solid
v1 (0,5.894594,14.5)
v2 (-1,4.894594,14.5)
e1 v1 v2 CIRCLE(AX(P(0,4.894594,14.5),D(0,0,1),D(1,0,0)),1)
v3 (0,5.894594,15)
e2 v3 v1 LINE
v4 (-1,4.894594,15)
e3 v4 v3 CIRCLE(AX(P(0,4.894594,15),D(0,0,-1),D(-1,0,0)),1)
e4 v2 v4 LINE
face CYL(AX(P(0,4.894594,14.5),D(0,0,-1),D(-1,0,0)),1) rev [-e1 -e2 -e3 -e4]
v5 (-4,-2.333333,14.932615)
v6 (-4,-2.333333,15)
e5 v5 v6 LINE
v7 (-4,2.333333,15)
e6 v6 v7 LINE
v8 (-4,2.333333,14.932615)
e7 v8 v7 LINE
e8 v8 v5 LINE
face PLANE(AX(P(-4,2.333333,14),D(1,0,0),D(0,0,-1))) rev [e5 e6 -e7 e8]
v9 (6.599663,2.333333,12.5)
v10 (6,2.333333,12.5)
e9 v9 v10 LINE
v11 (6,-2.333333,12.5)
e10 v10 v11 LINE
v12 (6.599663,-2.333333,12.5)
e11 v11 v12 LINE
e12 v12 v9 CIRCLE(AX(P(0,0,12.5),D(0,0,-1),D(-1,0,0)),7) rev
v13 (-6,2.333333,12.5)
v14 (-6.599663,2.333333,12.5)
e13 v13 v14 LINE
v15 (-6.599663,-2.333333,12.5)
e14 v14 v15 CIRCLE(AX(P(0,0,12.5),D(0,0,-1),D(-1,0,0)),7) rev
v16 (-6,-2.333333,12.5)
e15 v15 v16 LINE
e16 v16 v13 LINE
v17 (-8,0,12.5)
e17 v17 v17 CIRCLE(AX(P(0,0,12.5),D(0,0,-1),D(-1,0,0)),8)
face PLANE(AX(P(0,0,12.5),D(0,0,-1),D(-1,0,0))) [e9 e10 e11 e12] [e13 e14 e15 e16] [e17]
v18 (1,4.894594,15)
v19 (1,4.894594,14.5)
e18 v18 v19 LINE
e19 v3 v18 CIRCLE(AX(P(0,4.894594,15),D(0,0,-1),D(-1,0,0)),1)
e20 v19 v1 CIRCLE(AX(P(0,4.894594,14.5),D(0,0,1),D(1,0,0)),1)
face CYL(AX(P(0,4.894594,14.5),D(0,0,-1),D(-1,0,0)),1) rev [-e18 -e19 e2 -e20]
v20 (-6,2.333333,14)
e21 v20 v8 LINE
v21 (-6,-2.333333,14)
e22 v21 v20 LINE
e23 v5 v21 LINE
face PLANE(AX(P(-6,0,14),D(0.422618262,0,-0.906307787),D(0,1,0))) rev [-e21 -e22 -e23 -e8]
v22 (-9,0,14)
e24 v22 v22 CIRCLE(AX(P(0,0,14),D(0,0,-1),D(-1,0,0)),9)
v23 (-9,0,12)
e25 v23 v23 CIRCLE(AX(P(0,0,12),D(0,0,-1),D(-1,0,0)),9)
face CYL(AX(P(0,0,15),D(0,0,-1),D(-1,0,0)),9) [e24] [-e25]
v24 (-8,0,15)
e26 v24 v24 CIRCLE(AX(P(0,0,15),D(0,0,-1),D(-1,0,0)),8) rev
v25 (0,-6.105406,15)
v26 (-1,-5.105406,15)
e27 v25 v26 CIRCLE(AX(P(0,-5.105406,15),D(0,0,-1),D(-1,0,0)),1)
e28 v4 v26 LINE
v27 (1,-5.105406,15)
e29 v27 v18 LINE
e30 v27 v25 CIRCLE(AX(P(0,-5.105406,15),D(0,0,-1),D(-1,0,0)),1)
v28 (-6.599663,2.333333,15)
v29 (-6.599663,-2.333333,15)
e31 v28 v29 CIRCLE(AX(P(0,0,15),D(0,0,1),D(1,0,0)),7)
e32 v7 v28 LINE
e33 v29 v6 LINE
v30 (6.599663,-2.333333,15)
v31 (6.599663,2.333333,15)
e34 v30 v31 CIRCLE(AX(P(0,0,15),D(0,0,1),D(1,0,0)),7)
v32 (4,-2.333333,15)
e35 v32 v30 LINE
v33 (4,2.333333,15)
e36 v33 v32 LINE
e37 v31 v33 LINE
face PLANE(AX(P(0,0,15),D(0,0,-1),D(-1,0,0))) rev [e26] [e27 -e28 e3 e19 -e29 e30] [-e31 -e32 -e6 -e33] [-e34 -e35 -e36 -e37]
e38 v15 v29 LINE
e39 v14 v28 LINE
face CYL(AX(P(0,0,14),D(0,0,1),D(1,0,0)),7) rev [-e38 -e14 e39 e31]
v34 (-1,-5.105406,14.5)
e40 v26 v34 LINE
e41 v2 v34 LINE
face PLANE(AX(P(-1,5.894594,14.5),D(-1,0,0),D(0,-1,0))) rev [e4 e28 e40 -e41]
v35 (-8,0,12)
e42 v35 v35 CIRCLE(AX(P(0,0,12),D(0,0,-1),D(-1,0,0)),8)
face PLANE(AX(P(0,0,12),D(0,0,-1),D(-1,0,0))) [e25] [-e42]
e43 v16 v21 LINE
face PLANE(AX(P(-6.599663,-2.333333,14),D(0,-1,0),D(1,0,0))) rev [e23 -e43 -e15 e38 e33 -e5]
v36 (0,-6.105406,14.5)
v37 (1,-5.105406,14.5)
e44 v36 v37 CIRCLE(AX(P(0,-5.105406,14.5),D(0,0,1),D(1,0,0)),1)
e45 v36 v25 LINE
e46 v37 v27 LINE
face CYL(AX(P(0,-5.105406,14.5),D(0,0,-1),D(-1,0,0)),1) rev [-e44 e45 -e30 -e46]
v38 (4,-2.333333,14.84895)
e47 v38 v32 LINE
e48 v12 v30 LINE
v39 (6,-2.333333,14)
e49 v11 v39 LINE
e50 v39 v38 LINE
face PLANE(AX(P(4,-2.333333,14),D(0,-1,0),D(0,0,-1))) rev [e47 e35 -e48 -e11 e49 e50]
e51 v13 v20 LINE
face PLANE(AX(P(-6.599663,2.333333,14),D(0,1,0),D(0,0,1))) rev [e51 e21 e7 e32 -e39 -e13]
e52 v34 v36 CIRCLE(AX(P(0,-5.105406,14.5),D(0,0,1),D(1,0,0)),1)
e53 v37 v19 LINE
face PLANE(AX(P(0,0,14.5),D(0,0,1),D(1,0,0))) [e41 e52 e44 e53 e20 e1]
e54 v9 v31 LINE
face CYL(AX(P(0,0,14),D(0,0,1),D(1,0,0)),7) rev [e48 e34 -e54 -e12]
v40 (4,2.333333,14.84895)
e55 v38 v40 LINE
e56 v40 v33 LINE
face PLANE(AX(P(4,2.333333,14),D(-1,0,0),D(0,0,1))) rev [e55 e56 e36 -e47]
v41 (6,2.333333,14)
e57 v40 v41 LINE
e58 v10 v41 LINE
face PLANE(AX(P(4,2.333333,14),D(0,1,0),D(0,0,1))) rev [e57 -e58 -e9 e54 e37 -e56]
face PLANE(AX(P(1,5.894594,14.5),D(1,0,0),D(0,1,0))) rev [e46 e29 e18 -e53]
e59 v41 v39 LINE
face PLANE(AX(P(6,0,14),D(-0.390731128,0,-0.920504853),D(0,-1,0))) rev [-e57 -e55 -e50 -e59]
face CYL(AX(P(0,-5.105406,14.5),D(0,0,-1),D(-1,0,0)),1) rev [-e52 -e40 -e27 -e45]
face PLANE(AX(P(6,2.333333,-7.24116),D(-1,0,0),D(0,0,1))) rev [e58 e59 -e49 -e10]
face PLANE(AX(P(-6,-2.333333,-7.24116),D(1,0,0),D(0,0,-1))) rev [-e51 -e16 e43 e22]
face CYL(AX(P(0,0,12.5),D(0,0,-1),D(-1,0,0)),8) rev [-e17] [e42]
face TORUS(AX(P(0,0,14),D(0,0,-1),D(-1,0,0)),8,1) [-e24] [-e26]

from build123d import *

# Parameters (mm, degrees)
SKETCH_1_R          = 9
EXTRUDE_1_DEPTH     = 3
FILLET_1_R          = 1
SKETCH_3_W          = 2
SKETCH_3_H          = 12
CUT_EXTRUDE_1_DEPTH = 0.5
FILLET_2_R          = 1
CUT_EXTRUDE_2_DEPTH = 1
CHAMFER_2_SIZE      = 2
CHAMFER_2_SIZE2     = 0.932615316
CHAMFER_5_SIZE      = 2
CHAMFER_5_SIZE2     = 0.848949632
CUT_EXTRUDE_3_DEPTH = 8
CUT_EXTRUDE_START   = -2
SKETCH_7_R          = 7
CUT_EXTRUDE_4_DEPTH = 2
EXTRUDE_2_DEPTH     = 2
SKETCH_9_R          = 8
CUT_EXTRUDE_5_DEPTH = 0.5


with BuildPart() as part:
    # 草图1 → 凸台-拉伸1 (new body)
    with BuildSketch(Plane(origin=(0, 0, 12), x_dir=(-1, 0, 0), z_dir=(0, 0, -1))):
        Circle(SKETCH_1_R)
    extrude(amount=-EXTRUDE_1_DEPTH)

    # 圆角1
    fillet_1_edges = [part.edges().sort_by_distance(p)[0] for p in [
        (9, 0, 15),
    ]]
    fillet(fillet_1_edges, radius=FILLET_1_R)

    # 草图3 → 切除-拉伸1 (cut)
    with BuildSketch(Plane.XY.offset(15)):
        with Locations((0, -0.105406486)):
            Rectangle(SKETCH_3_W, SKETCH_3_H)
    extrude(amount=-CUT_EXTRUDE_1_DEPTH, mode=Mode.SUBTRACT)

    # 圆角2
    fillet_2_edges = [part.edges().sort_by_distance(p)[0] for p in [
        (1, -6.105406486, 14.75),
        (-1, -6.105406486, 14.75),
        (1, 5.894593514, 14.75),
        (-1, 5.894593514, 14.75),
    ]]
    fillet(fillet_2_edges, radius=FILLET_2_R - 0.0001)  # a hair under: the kernel refuses the full size

    # 草图4 → 切除-拉伸2 (cut)
    with BuildSketch(Plane.XY.offset(15)):
        with BuildLine():
            Line((-6.599663291, 2.333333333), (-4, 2.333333333))
            Line((-4, 2.333333333), (-4, -2.333333333))
            Line((-4, -2.333333333), (-6.599663291, -2.333333333))
            ThreePointArc((-6.599663291, -2.333333333), (-7, 0), (-6.599663291, 2.333333333))
        make_face()
        with BuildLine():
            Line((4, -2.333333333), (6.599663291, -2.333333333))
            ThreePointArc((6.599663291, -2.333333333), (7, 0), (6.599663291, 2.333333333))
            Line((6.599663291, 2.333333333), (4, 2.333333333))
            Line((4, 2.333333333), (4, -2.333333333))
        make_face()
    extrude(amount=-CUT_EXTRUDE_2_DEPTH, mode=Mode.SUBTRACT)

    # 倒角2
    chamfer_2_edges = [part.edges().sort_by_distance(p)[0] for p in [
        (-4, 0, 14),
    ]]
    chamfer_2_side = [part.faces().sort_by_distance(p)[0] for p in [
        (-5.436521823, 0, 14),
    ]]
    chamfer(chamfer_2_edges, length=CHAMFER_2_SIZE, length2=CHAMFER_2_SIZE2, reference=chamfer_2_side[0])

    # 倒角5
    chamfer_5_edges = [part.edges().sort_by_distance(p)[0] for p in [
        (4, 0, 14),
    ]]
    chamfer_5_side = [part.faces().sort_by_distance(p)[0] for p in [
        (5.436521823, 0, 14),
    ]]
    chamfer(chamfer_5_edges, length=CHAMFER_5_SIZE, length2=CHAMFER_5_SIZE2, reference=chamfer_5_side[0])

    # 草图6 → 切除-拉伸3 (cut)
    with BuildSketch(Plane.XY.offset(14)):
        with BuildLine():
            Line((-6.599663291, -2.333333333), (-6, -2.333333333))
            Line((-6, -2.333333333), (-6, 2.333333333))
            Line((-6, 2.333333333), (-6.599663291, 2.333333333))
            ThreePointArc((-6.599663291, 2.333333333), (-7, 0), (-6.599663291, -2.333333333))
        make_face()
        with BuildLine():
            Line((6.599663291, 2.333333333), (6, 2.333333333))
            Line((6, 2.333333333), (6, -2.333333333))
            Line((6, -2.333333333), (6.599663291, -2.333333333))
            ThreePointArc((6.599663291, -2.333333333), (7, 0), (6.599663291, 2.333333333))
        make_face()
    extrude(amount=-CUT_EXTRUDE_3_DEPTH, mode=Mode.SUBTRACT)

    # 草图7 → 切除-拉伸4 (cut)
    with BuildSketch(Plane(origin=(0, 0, 12), x_dir=(-1, 0, 0), z_dir=(0, 0, -1)).offset(CUT_EXTRUDE_START)):
        with Locations(Location((0, 0, 0), (0, 0, 199.471220634))):
            Circle(SKETCH_7_R)
    extrude(amount=CUT_EXTRUDE_4_DEPTH, mode=Mode.SUBTRACT)

    # 草图8 → 凸台-拉伸2 (add)
    with BuildSketch(Plane(origin=(0, 0, 14), x_dir=(-1, 0, 0), z_dir=(0, 0, -1))):
        with BuildLine():
            Line((-6.599663291, 2.333333333), (-6, 2.333333333))
            Line((-6, 2.333333333), (-6, -2.333333333))
            Line((-6, -2.333333333), (-6.599663291, -2.333333333))
            ThreePointArc((-6.599663291, -2.333333333), (0, -7), (6.599663291, -2.333333333))
            Line((6.599663291, -2.333333333), (6, -2.333333333))
            Line((6, -2.333333333), (6, 2.333333333))
            Line((6, 2.333333333), (6.599663291, 2.333333333))
            ThreePointArc((6.599663291, 2.333333333), (0, 7), (-6.599663291, 2.333333333))
        make_face()
    extrude(amount=EXTRUDE_2_DEPTH)

    # 草图9 → 切除-拉伸5 (cut)
    with BuildSketch(Plane(origin=(0, 0, 12), x_dir=(-1, 0, 0), z_dir=(0, 0, -1))):
        Circle(SKETCH_9_R)
    extrude(amount=-CUT_EXTRUDE_5_DEPTH, mode=Mode.SUBTRACT)


solid = part.part
